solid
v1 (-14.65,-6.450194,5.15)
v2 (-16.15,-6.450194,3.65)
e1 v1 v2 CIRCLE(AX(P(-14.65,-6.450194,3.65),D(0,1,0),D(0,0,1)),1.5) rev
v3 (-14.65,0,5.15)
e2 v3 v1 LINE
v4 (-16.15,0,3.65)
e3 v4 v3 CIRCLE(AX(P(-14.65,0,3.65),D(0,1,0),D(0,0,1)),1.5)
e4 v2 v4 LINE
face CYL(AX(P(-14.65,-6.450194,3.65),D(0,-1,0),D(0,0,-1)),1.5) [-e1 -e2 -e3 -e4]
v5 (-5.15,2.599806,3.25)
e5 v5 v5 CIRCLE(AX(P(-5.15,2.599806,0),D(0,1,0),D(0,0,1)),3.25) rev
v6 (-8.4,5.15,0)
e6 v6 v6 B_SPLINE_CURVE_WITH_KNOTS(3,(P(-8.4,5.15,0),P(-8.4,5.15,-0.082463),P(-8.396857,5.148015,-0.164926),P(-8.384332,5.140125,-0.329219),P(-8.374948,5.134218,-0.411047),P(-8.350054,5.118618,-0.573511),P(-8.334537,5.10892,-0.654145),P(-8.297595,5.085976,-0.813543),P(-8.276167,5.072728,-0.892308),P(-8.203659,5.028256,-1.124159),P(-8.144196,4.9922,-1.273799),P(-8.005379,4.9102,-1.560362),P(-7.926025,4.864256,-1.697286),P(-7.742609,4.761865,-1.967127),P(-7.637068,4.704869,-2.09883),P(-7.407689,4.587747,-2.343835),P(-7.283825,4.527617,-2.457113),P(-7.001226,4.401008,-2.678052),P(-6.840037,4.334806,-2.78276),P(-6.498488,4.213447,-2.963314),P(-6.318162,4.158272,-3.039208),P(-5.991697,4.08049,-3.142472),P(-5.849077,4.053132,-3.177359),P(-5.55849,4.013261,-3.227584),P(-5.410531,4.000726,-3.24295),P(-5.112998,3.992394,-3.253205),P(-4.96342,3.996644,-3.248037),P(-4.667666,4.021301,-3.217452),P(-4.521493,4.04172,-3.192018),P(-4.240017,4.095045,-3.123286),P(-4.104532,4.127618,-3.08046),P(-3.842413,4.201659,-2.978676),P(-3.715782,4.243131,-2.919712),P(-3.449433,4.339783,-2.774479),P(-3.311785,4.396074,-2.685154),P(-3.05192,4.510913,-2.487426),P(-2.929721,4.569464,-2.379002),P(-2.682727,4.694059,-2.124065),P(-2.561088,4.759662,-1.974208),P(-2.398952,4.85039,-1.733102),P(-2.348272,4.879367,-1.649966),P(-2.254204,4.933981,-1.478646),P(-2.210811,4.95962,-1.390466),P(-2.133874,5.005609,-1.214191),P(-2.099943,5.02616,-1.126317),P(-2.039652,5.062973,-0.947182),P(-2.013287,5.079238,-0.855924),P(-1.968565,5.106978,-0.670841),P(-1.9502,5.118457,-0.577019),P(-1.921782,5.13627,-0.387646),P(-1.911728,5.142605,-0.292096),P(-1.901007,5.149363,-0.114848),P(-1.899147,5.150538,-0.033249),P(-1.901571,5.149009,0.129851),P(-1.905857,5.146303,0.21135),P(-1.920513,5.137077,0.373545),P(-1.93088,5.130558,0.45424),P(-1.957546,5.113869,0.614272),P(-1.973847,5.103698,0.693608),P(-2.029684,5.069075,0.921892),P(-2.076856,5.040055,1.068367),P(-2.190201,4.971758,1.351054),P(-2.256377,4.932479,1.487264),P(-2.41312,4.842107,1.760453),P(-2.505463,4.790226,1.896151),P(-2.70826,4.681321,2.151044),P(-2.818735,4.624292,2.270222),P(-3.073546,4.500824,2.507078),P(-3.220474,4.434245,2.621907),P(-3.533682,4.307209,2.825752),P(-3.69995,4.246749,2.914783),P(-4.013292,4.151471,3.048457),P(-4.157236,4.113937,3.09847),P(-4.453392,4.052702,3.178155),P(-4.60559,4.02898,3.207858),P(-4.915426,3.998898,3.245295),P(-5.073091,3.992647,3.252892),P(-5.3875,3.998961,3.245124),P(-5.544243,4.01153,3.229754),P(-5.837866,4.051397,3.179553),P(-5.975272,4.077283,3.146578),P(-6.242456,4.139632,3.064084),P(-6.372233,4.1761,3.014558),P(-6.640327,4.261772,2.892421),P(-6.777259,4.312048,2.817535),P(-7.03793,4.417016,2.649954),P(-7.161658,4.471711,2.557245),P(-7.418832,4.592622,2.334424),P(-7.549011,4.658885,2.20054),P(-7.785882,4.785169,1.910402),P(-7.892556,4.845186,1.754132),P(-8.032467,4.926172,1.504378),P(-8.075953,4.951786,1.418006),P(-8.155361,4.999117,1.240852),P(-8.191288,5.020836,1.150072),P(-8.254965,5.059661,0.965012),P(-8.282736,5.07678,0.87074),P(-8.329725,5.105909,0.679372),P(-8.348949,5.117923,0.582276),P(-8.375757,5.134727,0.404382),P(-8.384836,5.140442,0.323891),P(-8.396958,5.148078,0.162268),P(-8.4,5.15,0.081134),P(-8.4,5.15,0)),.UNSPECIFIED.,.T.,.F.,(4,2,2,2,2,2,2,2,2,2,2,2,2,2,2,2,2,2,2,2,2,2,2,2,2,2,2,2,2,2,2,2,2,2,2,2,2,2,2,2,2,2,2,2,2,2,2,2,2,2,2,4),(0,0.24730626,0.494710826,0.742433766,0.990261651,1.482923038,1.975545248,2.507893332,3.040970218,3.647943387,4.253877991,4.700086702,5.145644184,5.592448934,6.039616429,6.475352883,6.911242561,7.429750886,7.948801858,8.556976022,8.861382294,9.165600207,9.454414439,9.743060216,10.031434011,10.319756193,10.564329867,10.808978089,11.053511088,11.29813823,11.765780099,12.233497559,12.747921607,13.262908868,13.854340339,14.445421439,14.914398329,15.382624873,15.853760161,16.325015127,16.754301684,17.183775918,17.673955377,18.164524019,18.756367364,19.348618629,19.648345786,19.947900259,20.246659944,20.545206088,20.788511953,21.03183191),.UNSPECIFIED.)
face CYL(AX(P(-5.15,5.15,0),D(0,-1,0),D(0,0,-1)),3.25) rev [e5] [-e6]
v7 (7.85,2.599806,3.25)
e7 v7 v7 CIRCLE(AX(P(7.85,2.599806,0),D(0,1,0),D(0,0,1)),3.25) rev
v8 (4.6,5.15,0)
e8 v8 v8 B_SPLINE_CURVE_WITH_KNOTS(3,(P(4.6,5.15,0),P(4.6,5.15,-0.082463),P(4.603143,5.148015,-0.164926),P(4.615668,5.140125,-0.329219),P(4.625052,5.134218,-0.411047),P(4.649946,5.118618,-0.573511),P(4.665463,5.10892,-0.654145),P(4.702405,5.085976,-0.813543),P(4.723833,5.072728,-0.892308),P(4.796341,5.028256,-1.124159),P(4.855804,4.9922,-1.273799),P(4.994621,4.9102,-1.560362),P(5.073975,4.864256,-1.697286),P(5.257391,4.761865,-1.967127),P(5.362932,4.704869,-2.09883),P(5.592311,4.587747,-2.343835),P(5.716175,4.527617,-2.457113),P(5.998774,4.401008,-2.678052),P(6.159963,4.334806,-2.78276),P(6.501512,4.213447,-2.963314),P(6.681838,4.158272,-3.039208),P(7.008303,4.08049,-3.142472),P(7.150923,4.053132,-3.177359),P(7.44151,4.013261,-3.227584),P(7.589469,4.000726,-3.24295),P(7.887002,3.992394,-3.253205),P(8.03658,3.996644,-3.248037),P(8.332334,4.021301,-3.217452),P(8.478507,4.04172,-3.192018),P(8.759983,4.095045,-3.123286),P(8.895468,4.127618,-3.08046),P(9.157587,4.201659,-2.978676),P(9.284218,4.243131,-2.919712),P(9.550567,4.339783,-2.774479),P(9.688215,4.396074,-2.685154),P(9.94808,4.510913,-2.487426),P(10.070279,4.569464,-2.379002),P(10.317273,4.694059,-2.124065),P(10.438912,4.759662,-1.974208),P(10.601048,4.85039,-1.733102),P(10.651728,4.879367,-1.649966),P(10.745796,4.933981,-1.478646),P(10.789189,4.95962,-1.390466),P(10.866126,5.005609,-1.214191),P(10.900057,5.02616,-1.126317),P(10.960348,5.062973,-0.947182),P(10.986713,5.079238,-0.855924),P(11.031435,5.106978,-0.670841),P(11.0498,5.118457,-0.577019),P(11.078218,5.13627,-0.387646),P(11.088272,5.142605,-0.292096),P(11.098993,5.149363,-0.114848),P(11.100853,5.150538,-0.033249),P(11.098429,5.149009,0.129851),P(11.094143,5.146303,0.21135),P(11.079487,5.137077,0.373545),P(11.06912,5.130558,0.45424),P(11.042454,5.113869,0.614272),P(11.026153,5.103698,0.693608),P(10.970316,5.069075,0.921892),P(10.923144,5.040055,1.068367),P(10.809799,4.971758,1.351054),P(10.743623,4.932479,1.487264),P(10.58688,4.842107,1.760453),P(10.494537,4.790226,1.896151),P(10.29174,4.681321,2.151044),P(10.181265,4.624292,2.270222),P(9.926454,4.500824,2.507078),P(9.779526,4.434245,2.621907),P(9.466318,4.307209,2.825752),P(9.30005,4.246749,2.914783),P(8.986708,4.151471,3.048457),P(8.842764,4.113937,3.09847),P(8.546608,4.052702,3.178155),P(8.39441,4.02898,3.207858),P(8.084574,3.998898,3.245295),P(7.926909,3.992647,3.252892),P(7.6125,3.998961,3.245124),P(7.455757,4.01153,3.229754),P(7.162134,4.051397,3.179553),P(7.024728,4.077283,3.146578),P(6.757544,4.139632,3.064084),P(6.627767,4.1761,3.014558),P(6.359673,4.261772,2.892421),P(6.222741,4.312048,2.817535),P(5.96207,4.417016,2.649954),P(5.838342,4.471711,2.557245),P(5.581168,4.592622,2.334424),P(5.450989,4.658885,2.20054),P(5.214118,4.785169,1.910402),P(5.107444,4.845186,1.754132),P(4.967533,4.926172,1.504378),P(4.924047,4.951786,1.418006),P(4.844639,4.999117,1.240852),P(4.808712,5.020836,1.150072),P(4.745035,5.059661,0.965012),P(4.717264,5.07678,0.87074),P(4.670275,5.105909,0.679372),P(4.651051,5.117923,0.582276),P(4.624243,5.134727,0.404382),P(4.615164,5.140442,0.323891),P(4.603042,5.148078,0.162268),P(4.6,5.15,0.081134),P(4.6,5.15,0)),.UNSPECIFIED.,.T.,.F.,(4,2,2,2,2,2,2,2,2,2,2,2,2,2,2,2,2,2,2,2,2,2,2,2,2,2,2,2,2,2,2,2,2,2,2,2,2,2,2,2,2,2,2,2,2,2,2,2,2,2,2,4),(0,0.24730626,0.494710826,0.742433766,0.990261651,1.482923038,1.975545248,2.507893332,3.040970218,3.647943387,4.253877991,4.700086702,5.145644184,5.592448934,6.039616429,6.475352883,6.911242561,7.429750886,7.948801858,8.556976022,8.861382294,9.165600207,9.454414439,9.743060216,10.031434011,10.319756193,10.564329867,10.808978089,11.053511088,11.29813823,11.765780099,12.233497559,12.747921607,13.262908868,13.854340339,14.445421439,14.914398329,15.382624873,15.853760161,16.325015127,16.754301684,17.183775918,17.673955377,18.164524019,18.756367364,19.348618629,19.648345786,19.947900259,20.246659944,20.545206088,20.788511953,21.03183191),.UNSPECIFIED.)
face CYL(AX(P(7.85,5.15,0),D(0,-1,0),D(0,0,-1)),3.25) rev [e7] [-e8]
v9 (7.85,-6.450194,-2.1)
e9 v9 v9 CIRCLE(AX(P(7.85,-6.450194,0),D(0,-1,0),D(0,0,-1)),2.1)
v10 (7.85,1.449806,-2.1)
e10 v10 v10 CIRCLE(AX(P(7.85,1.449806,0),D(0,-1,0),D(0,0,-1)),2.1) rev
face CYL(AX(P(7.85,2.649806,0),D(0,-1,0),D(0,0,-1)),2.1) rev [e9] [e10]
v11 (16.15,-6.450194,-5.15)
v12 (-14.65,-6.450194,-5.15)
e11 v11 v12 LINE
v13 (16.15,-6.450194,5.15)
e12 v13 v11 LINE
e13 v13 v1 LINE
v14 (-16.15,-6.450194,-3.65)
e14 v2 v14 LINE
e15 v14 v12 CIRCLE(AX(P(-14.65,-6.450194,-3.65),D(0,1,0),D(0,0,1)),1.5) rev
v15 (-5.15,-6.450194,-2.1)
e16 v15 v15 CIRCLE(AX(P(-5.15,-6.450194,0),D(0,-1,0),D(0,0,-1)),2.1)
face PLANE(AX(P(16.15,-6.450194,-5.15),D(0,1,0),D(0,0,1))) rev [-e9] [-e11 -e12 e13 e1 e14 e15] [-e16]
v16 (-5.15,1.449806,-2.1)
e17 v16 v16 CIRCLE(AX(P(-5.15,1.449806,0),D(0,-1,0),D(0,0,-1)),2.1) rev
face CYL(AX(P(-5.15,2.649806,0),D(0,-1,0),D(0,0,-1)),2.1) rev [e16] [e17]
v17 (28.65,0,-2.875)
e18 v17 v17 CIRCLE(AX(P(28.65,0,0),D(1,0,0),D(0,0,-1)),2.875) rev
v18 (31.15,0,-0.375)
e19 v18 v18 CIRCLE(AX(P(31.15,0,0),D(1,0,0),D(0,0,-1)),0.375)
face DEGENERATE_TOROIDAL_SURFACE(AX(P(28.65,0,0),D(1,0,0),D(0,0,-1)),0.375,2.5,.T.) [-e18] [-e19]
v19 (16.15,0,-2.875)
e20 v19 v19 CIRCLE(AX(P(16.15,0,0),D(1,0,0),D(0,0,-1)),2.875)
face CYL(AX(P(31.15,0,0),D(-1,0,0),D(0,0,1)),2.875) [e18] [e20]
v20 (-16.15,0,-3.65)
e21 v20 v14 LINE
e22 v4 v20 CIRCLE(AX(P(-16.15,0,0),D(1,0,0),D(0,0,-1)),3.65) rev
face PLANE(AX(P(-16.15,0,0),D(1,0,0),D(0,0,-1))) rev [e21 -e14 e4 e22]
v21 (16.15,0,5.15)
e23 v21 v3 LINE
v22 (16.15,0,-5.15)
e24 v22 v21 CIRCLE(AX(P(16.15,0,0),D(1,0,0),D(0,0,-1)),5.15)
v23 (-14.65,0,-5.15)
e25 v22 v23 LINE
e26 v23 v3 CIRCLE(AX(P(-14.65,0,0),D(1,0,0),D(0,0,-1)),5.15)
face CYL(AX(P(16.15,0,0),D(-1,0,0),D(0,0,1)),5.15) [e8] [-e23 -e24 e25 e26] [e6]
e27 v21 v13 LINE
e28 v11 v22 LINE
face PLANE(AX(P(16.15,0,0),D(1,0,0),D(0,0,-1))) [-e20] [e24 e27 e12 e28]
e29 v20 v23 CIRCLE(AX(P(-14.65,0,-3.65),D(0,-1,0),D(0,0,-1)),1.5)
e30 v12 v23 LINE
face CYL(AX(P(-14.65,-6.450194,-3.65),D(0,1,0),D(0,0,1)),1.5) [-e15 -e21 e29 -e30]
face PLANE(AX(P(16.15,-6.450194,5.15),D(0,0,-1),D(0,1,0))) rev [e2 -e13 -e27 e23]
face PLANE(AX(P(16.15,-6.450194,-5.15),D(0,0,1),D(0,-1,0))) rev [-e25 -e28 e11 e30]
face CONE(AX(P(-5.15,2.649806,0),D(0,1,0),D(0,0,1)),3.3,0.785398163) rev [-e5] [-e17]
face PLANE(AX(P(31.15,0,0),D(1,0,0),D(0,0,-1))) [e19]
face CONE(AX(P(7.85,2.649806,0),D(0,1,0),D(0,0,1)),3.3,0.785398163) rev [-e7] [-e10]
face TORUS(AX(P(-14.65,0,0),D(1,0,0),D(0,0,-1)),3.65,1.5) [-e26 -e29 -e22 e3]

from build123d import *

# Parameters (mm, degrees)
ESBO_O1_R                = 2.95
RESSALTO_EXTRUS_O1_DEPTH = 16.15
RESSALTO_EXTRUS_O2_DEPTH = 32.3
FILETE1_R                = 1.5
ESBO_O3_R                = 3.25
CORTE_EXTRUS_O1_DEPTH    = 21.540435635
ESBO_O5_R                = 3.25
ESBO_O5_R_2              = 2.1
RESSALTO_EXTRUS_O3_DEPTH = 9.1
CHANFRO1_SIZE            = 1.2
ESBO_O7_R                = 2.875
RESSALTO_EXTRUS_O6_DEPTH = 15
FILETE2_R                = 2.5


with BuildPart() as part:
    # Esboço1 → Ressalto-extrusão1 (new, symmetric)
    with BuildSketch(Plane(origin=(0, 0, 0), x_dir=(0, 0, -1), z_dir=(1, 0, 0))):
        with BuildLine():
            Line((5.15, -6.450193796), (-5.15, -6.450193796))
            Line((-5.15, -6.450193796), (-5.15, 0))
            ThreePointArc((-5.15, 0), (0, 5.15), (5.15, 0))
            Line((5.15, 0), (5.15, -6.450193796))
        make_face()
        Circle(ESBO_O1_R, mode=Mode.SUBTRACT)
    extrude(amount=RESSALTO_EXTRUS_O1_DEPTH, both=True)

    # Esboço2 → Ressalto-extrusão2 (add, through all)
    with BuildSketch(Plane.ZY.offset(16.15)):
        with BuildLine():
            Line((-5.15, 0), (-5.15, -6.450193796))
            Line((-5.15, -6.450193796), (5.15, -6.450193796))
            Line((5.15, -6.450193796), (5.15, 0))
            ThreePointArc((5.15, 0), (0, 5.15), (-5.15, 0))
        make_face()
    extrude(amount=-RESSALTO_EXTRUS_O2_DEPTH)

    # Filete1
    filete1_edges = [part.edges().sort_by_distance(p)[0] for p in [
        (-16.15, -3.225096898, -5.15),
        (-16.15, -3.225096898, 5.15),
        (-16.15, 5.15, 0),
    ]]
    fillet(filete1_edges, radius=FILETE1_R)

    # Esboço3 → Corte-extrusão1 (cut, through all)
    with BuildSketch(Plane.XZ.offset(6.450193796)):
        with Locations(Location((-5.15, 0, 0), (0, 0, 270))):
            Circle(ESBO_O3_R)
        with Locations(Location((7.85, 0, 0), (0, 0, 270))):
            Circle(ESBO_O3_R)
    extrude(amount=-CORTE_EXTRUS_O1_DEPTH, mode=Mode.SUBTRACT)

    # Esboço5 → Ressalto-extrusão3 (add)
    # profile 1 of 2: a face of its own
    with BuildSketch(Plane.XZ.offset(6.450193796)):
        with Locations(Location((7.85, 0, 0), (0, 0, 270))):
            Circle(ESBO_O5_R)
        with Locations(Location((7.85, 0, 0), (0, 0, 270))):
            Circle(ESBO_O5_R_2, mode=Mode.SUBTRACT)
    # profile 2 of 2: a face of its own
    with BuildSketch(Plane.XZ.offset(6.450193796)):
        with Locations(Location((-5.15, 0, 0), (0, 0, 270))):
            Circle(ESBO_O5_R)
        with Locations(Location((-5.15, 0, 0), (0, 0, 270))):
            Circle(ESBO_O5_R_2, mode=Mode.SUBTRACT)
    extrude(amount=-RESSALTO_EXTRUS_O3_DEPTH)

    # Chanfro1
    # the kernel refuses this chamfer: 1.2 mm, written as the material it takes off along each edge
    with BuildSketch(Plane(origin=(-5.15, 2.649806204, 0), x_dir=(0, 0, -1), z_dir=(-1, 0, 0))) as chanfro1_piece_1_section:
        Polygon((2.1 + CHANFRO1_SIZE, 0), (2.1, CHANFRO1_SIZE), (2.1, 0), align=None)
    chanfro1_piece_1 = revolve(axis=Axis((-5.15, 2.649806204, 0), (0, -1, 0)), mode=Mode.PRIVATE)
    chanfro1_piece_1 = chanfro1_piece_1 & Plane(origin=(-5.15, 2.024165302, 0), x_dir=(0, 0, -1), z_dir=(0, -1, 0)) * Cylinder(3.25, 14, mode=Mode.PRIVATE)
    add(chanfro1_piece_1, mode=Mode.SUBTRACT)
    with BuildSketch(Plane(origin=(7.85, 2.649806204, 0), x_dir=(0, 0, -1), z_dir=(-1, 0, 0))) as chanfro1_piece_2_section:
        Polygon((2.1 + CHANFRO1_SIZE, 0), (2.1, CHANFRO1_SIZE), (2.1, 0), align=None)
    chanfro1_piece_2 = revolve(axis=Axis((7.85, 2.649806204, 0), (0, -1, 0)), mode=Mode.PRIVATE)
    chanfro1_piece_2 = chanfro1_piece_2 & Plane(origin=(7.85, 2.024165302, 0), x_dir=(0, 0, -1), z_dir=(0, -1, 0)) * Cylinder(3.25, 14, mode=Mode.PRIVATE)
    add(chanfro1_piece_2, mode=Mode.SUBTRACT)

    # Esboço7 → Ressalto-extrusão6 (add)
    with BuildSketch(Plane(origin=(16.15, 0, 0), x_dir=(0, 0, -1), z_dir=(1, 0, 0))):
        Circle(ESBO_O7_R)
    extrude(amount=RESSALTO_EXTRUS_O6_DEPTH)

    # Filete2
    filete2_edges = [part.edges().sort_by_distance(p)[0] for p in [
        (31.15, 0, 2.875),
    ]]
    fillet(filete2_edges, radius=FILETE2_R)


solid = part.part
